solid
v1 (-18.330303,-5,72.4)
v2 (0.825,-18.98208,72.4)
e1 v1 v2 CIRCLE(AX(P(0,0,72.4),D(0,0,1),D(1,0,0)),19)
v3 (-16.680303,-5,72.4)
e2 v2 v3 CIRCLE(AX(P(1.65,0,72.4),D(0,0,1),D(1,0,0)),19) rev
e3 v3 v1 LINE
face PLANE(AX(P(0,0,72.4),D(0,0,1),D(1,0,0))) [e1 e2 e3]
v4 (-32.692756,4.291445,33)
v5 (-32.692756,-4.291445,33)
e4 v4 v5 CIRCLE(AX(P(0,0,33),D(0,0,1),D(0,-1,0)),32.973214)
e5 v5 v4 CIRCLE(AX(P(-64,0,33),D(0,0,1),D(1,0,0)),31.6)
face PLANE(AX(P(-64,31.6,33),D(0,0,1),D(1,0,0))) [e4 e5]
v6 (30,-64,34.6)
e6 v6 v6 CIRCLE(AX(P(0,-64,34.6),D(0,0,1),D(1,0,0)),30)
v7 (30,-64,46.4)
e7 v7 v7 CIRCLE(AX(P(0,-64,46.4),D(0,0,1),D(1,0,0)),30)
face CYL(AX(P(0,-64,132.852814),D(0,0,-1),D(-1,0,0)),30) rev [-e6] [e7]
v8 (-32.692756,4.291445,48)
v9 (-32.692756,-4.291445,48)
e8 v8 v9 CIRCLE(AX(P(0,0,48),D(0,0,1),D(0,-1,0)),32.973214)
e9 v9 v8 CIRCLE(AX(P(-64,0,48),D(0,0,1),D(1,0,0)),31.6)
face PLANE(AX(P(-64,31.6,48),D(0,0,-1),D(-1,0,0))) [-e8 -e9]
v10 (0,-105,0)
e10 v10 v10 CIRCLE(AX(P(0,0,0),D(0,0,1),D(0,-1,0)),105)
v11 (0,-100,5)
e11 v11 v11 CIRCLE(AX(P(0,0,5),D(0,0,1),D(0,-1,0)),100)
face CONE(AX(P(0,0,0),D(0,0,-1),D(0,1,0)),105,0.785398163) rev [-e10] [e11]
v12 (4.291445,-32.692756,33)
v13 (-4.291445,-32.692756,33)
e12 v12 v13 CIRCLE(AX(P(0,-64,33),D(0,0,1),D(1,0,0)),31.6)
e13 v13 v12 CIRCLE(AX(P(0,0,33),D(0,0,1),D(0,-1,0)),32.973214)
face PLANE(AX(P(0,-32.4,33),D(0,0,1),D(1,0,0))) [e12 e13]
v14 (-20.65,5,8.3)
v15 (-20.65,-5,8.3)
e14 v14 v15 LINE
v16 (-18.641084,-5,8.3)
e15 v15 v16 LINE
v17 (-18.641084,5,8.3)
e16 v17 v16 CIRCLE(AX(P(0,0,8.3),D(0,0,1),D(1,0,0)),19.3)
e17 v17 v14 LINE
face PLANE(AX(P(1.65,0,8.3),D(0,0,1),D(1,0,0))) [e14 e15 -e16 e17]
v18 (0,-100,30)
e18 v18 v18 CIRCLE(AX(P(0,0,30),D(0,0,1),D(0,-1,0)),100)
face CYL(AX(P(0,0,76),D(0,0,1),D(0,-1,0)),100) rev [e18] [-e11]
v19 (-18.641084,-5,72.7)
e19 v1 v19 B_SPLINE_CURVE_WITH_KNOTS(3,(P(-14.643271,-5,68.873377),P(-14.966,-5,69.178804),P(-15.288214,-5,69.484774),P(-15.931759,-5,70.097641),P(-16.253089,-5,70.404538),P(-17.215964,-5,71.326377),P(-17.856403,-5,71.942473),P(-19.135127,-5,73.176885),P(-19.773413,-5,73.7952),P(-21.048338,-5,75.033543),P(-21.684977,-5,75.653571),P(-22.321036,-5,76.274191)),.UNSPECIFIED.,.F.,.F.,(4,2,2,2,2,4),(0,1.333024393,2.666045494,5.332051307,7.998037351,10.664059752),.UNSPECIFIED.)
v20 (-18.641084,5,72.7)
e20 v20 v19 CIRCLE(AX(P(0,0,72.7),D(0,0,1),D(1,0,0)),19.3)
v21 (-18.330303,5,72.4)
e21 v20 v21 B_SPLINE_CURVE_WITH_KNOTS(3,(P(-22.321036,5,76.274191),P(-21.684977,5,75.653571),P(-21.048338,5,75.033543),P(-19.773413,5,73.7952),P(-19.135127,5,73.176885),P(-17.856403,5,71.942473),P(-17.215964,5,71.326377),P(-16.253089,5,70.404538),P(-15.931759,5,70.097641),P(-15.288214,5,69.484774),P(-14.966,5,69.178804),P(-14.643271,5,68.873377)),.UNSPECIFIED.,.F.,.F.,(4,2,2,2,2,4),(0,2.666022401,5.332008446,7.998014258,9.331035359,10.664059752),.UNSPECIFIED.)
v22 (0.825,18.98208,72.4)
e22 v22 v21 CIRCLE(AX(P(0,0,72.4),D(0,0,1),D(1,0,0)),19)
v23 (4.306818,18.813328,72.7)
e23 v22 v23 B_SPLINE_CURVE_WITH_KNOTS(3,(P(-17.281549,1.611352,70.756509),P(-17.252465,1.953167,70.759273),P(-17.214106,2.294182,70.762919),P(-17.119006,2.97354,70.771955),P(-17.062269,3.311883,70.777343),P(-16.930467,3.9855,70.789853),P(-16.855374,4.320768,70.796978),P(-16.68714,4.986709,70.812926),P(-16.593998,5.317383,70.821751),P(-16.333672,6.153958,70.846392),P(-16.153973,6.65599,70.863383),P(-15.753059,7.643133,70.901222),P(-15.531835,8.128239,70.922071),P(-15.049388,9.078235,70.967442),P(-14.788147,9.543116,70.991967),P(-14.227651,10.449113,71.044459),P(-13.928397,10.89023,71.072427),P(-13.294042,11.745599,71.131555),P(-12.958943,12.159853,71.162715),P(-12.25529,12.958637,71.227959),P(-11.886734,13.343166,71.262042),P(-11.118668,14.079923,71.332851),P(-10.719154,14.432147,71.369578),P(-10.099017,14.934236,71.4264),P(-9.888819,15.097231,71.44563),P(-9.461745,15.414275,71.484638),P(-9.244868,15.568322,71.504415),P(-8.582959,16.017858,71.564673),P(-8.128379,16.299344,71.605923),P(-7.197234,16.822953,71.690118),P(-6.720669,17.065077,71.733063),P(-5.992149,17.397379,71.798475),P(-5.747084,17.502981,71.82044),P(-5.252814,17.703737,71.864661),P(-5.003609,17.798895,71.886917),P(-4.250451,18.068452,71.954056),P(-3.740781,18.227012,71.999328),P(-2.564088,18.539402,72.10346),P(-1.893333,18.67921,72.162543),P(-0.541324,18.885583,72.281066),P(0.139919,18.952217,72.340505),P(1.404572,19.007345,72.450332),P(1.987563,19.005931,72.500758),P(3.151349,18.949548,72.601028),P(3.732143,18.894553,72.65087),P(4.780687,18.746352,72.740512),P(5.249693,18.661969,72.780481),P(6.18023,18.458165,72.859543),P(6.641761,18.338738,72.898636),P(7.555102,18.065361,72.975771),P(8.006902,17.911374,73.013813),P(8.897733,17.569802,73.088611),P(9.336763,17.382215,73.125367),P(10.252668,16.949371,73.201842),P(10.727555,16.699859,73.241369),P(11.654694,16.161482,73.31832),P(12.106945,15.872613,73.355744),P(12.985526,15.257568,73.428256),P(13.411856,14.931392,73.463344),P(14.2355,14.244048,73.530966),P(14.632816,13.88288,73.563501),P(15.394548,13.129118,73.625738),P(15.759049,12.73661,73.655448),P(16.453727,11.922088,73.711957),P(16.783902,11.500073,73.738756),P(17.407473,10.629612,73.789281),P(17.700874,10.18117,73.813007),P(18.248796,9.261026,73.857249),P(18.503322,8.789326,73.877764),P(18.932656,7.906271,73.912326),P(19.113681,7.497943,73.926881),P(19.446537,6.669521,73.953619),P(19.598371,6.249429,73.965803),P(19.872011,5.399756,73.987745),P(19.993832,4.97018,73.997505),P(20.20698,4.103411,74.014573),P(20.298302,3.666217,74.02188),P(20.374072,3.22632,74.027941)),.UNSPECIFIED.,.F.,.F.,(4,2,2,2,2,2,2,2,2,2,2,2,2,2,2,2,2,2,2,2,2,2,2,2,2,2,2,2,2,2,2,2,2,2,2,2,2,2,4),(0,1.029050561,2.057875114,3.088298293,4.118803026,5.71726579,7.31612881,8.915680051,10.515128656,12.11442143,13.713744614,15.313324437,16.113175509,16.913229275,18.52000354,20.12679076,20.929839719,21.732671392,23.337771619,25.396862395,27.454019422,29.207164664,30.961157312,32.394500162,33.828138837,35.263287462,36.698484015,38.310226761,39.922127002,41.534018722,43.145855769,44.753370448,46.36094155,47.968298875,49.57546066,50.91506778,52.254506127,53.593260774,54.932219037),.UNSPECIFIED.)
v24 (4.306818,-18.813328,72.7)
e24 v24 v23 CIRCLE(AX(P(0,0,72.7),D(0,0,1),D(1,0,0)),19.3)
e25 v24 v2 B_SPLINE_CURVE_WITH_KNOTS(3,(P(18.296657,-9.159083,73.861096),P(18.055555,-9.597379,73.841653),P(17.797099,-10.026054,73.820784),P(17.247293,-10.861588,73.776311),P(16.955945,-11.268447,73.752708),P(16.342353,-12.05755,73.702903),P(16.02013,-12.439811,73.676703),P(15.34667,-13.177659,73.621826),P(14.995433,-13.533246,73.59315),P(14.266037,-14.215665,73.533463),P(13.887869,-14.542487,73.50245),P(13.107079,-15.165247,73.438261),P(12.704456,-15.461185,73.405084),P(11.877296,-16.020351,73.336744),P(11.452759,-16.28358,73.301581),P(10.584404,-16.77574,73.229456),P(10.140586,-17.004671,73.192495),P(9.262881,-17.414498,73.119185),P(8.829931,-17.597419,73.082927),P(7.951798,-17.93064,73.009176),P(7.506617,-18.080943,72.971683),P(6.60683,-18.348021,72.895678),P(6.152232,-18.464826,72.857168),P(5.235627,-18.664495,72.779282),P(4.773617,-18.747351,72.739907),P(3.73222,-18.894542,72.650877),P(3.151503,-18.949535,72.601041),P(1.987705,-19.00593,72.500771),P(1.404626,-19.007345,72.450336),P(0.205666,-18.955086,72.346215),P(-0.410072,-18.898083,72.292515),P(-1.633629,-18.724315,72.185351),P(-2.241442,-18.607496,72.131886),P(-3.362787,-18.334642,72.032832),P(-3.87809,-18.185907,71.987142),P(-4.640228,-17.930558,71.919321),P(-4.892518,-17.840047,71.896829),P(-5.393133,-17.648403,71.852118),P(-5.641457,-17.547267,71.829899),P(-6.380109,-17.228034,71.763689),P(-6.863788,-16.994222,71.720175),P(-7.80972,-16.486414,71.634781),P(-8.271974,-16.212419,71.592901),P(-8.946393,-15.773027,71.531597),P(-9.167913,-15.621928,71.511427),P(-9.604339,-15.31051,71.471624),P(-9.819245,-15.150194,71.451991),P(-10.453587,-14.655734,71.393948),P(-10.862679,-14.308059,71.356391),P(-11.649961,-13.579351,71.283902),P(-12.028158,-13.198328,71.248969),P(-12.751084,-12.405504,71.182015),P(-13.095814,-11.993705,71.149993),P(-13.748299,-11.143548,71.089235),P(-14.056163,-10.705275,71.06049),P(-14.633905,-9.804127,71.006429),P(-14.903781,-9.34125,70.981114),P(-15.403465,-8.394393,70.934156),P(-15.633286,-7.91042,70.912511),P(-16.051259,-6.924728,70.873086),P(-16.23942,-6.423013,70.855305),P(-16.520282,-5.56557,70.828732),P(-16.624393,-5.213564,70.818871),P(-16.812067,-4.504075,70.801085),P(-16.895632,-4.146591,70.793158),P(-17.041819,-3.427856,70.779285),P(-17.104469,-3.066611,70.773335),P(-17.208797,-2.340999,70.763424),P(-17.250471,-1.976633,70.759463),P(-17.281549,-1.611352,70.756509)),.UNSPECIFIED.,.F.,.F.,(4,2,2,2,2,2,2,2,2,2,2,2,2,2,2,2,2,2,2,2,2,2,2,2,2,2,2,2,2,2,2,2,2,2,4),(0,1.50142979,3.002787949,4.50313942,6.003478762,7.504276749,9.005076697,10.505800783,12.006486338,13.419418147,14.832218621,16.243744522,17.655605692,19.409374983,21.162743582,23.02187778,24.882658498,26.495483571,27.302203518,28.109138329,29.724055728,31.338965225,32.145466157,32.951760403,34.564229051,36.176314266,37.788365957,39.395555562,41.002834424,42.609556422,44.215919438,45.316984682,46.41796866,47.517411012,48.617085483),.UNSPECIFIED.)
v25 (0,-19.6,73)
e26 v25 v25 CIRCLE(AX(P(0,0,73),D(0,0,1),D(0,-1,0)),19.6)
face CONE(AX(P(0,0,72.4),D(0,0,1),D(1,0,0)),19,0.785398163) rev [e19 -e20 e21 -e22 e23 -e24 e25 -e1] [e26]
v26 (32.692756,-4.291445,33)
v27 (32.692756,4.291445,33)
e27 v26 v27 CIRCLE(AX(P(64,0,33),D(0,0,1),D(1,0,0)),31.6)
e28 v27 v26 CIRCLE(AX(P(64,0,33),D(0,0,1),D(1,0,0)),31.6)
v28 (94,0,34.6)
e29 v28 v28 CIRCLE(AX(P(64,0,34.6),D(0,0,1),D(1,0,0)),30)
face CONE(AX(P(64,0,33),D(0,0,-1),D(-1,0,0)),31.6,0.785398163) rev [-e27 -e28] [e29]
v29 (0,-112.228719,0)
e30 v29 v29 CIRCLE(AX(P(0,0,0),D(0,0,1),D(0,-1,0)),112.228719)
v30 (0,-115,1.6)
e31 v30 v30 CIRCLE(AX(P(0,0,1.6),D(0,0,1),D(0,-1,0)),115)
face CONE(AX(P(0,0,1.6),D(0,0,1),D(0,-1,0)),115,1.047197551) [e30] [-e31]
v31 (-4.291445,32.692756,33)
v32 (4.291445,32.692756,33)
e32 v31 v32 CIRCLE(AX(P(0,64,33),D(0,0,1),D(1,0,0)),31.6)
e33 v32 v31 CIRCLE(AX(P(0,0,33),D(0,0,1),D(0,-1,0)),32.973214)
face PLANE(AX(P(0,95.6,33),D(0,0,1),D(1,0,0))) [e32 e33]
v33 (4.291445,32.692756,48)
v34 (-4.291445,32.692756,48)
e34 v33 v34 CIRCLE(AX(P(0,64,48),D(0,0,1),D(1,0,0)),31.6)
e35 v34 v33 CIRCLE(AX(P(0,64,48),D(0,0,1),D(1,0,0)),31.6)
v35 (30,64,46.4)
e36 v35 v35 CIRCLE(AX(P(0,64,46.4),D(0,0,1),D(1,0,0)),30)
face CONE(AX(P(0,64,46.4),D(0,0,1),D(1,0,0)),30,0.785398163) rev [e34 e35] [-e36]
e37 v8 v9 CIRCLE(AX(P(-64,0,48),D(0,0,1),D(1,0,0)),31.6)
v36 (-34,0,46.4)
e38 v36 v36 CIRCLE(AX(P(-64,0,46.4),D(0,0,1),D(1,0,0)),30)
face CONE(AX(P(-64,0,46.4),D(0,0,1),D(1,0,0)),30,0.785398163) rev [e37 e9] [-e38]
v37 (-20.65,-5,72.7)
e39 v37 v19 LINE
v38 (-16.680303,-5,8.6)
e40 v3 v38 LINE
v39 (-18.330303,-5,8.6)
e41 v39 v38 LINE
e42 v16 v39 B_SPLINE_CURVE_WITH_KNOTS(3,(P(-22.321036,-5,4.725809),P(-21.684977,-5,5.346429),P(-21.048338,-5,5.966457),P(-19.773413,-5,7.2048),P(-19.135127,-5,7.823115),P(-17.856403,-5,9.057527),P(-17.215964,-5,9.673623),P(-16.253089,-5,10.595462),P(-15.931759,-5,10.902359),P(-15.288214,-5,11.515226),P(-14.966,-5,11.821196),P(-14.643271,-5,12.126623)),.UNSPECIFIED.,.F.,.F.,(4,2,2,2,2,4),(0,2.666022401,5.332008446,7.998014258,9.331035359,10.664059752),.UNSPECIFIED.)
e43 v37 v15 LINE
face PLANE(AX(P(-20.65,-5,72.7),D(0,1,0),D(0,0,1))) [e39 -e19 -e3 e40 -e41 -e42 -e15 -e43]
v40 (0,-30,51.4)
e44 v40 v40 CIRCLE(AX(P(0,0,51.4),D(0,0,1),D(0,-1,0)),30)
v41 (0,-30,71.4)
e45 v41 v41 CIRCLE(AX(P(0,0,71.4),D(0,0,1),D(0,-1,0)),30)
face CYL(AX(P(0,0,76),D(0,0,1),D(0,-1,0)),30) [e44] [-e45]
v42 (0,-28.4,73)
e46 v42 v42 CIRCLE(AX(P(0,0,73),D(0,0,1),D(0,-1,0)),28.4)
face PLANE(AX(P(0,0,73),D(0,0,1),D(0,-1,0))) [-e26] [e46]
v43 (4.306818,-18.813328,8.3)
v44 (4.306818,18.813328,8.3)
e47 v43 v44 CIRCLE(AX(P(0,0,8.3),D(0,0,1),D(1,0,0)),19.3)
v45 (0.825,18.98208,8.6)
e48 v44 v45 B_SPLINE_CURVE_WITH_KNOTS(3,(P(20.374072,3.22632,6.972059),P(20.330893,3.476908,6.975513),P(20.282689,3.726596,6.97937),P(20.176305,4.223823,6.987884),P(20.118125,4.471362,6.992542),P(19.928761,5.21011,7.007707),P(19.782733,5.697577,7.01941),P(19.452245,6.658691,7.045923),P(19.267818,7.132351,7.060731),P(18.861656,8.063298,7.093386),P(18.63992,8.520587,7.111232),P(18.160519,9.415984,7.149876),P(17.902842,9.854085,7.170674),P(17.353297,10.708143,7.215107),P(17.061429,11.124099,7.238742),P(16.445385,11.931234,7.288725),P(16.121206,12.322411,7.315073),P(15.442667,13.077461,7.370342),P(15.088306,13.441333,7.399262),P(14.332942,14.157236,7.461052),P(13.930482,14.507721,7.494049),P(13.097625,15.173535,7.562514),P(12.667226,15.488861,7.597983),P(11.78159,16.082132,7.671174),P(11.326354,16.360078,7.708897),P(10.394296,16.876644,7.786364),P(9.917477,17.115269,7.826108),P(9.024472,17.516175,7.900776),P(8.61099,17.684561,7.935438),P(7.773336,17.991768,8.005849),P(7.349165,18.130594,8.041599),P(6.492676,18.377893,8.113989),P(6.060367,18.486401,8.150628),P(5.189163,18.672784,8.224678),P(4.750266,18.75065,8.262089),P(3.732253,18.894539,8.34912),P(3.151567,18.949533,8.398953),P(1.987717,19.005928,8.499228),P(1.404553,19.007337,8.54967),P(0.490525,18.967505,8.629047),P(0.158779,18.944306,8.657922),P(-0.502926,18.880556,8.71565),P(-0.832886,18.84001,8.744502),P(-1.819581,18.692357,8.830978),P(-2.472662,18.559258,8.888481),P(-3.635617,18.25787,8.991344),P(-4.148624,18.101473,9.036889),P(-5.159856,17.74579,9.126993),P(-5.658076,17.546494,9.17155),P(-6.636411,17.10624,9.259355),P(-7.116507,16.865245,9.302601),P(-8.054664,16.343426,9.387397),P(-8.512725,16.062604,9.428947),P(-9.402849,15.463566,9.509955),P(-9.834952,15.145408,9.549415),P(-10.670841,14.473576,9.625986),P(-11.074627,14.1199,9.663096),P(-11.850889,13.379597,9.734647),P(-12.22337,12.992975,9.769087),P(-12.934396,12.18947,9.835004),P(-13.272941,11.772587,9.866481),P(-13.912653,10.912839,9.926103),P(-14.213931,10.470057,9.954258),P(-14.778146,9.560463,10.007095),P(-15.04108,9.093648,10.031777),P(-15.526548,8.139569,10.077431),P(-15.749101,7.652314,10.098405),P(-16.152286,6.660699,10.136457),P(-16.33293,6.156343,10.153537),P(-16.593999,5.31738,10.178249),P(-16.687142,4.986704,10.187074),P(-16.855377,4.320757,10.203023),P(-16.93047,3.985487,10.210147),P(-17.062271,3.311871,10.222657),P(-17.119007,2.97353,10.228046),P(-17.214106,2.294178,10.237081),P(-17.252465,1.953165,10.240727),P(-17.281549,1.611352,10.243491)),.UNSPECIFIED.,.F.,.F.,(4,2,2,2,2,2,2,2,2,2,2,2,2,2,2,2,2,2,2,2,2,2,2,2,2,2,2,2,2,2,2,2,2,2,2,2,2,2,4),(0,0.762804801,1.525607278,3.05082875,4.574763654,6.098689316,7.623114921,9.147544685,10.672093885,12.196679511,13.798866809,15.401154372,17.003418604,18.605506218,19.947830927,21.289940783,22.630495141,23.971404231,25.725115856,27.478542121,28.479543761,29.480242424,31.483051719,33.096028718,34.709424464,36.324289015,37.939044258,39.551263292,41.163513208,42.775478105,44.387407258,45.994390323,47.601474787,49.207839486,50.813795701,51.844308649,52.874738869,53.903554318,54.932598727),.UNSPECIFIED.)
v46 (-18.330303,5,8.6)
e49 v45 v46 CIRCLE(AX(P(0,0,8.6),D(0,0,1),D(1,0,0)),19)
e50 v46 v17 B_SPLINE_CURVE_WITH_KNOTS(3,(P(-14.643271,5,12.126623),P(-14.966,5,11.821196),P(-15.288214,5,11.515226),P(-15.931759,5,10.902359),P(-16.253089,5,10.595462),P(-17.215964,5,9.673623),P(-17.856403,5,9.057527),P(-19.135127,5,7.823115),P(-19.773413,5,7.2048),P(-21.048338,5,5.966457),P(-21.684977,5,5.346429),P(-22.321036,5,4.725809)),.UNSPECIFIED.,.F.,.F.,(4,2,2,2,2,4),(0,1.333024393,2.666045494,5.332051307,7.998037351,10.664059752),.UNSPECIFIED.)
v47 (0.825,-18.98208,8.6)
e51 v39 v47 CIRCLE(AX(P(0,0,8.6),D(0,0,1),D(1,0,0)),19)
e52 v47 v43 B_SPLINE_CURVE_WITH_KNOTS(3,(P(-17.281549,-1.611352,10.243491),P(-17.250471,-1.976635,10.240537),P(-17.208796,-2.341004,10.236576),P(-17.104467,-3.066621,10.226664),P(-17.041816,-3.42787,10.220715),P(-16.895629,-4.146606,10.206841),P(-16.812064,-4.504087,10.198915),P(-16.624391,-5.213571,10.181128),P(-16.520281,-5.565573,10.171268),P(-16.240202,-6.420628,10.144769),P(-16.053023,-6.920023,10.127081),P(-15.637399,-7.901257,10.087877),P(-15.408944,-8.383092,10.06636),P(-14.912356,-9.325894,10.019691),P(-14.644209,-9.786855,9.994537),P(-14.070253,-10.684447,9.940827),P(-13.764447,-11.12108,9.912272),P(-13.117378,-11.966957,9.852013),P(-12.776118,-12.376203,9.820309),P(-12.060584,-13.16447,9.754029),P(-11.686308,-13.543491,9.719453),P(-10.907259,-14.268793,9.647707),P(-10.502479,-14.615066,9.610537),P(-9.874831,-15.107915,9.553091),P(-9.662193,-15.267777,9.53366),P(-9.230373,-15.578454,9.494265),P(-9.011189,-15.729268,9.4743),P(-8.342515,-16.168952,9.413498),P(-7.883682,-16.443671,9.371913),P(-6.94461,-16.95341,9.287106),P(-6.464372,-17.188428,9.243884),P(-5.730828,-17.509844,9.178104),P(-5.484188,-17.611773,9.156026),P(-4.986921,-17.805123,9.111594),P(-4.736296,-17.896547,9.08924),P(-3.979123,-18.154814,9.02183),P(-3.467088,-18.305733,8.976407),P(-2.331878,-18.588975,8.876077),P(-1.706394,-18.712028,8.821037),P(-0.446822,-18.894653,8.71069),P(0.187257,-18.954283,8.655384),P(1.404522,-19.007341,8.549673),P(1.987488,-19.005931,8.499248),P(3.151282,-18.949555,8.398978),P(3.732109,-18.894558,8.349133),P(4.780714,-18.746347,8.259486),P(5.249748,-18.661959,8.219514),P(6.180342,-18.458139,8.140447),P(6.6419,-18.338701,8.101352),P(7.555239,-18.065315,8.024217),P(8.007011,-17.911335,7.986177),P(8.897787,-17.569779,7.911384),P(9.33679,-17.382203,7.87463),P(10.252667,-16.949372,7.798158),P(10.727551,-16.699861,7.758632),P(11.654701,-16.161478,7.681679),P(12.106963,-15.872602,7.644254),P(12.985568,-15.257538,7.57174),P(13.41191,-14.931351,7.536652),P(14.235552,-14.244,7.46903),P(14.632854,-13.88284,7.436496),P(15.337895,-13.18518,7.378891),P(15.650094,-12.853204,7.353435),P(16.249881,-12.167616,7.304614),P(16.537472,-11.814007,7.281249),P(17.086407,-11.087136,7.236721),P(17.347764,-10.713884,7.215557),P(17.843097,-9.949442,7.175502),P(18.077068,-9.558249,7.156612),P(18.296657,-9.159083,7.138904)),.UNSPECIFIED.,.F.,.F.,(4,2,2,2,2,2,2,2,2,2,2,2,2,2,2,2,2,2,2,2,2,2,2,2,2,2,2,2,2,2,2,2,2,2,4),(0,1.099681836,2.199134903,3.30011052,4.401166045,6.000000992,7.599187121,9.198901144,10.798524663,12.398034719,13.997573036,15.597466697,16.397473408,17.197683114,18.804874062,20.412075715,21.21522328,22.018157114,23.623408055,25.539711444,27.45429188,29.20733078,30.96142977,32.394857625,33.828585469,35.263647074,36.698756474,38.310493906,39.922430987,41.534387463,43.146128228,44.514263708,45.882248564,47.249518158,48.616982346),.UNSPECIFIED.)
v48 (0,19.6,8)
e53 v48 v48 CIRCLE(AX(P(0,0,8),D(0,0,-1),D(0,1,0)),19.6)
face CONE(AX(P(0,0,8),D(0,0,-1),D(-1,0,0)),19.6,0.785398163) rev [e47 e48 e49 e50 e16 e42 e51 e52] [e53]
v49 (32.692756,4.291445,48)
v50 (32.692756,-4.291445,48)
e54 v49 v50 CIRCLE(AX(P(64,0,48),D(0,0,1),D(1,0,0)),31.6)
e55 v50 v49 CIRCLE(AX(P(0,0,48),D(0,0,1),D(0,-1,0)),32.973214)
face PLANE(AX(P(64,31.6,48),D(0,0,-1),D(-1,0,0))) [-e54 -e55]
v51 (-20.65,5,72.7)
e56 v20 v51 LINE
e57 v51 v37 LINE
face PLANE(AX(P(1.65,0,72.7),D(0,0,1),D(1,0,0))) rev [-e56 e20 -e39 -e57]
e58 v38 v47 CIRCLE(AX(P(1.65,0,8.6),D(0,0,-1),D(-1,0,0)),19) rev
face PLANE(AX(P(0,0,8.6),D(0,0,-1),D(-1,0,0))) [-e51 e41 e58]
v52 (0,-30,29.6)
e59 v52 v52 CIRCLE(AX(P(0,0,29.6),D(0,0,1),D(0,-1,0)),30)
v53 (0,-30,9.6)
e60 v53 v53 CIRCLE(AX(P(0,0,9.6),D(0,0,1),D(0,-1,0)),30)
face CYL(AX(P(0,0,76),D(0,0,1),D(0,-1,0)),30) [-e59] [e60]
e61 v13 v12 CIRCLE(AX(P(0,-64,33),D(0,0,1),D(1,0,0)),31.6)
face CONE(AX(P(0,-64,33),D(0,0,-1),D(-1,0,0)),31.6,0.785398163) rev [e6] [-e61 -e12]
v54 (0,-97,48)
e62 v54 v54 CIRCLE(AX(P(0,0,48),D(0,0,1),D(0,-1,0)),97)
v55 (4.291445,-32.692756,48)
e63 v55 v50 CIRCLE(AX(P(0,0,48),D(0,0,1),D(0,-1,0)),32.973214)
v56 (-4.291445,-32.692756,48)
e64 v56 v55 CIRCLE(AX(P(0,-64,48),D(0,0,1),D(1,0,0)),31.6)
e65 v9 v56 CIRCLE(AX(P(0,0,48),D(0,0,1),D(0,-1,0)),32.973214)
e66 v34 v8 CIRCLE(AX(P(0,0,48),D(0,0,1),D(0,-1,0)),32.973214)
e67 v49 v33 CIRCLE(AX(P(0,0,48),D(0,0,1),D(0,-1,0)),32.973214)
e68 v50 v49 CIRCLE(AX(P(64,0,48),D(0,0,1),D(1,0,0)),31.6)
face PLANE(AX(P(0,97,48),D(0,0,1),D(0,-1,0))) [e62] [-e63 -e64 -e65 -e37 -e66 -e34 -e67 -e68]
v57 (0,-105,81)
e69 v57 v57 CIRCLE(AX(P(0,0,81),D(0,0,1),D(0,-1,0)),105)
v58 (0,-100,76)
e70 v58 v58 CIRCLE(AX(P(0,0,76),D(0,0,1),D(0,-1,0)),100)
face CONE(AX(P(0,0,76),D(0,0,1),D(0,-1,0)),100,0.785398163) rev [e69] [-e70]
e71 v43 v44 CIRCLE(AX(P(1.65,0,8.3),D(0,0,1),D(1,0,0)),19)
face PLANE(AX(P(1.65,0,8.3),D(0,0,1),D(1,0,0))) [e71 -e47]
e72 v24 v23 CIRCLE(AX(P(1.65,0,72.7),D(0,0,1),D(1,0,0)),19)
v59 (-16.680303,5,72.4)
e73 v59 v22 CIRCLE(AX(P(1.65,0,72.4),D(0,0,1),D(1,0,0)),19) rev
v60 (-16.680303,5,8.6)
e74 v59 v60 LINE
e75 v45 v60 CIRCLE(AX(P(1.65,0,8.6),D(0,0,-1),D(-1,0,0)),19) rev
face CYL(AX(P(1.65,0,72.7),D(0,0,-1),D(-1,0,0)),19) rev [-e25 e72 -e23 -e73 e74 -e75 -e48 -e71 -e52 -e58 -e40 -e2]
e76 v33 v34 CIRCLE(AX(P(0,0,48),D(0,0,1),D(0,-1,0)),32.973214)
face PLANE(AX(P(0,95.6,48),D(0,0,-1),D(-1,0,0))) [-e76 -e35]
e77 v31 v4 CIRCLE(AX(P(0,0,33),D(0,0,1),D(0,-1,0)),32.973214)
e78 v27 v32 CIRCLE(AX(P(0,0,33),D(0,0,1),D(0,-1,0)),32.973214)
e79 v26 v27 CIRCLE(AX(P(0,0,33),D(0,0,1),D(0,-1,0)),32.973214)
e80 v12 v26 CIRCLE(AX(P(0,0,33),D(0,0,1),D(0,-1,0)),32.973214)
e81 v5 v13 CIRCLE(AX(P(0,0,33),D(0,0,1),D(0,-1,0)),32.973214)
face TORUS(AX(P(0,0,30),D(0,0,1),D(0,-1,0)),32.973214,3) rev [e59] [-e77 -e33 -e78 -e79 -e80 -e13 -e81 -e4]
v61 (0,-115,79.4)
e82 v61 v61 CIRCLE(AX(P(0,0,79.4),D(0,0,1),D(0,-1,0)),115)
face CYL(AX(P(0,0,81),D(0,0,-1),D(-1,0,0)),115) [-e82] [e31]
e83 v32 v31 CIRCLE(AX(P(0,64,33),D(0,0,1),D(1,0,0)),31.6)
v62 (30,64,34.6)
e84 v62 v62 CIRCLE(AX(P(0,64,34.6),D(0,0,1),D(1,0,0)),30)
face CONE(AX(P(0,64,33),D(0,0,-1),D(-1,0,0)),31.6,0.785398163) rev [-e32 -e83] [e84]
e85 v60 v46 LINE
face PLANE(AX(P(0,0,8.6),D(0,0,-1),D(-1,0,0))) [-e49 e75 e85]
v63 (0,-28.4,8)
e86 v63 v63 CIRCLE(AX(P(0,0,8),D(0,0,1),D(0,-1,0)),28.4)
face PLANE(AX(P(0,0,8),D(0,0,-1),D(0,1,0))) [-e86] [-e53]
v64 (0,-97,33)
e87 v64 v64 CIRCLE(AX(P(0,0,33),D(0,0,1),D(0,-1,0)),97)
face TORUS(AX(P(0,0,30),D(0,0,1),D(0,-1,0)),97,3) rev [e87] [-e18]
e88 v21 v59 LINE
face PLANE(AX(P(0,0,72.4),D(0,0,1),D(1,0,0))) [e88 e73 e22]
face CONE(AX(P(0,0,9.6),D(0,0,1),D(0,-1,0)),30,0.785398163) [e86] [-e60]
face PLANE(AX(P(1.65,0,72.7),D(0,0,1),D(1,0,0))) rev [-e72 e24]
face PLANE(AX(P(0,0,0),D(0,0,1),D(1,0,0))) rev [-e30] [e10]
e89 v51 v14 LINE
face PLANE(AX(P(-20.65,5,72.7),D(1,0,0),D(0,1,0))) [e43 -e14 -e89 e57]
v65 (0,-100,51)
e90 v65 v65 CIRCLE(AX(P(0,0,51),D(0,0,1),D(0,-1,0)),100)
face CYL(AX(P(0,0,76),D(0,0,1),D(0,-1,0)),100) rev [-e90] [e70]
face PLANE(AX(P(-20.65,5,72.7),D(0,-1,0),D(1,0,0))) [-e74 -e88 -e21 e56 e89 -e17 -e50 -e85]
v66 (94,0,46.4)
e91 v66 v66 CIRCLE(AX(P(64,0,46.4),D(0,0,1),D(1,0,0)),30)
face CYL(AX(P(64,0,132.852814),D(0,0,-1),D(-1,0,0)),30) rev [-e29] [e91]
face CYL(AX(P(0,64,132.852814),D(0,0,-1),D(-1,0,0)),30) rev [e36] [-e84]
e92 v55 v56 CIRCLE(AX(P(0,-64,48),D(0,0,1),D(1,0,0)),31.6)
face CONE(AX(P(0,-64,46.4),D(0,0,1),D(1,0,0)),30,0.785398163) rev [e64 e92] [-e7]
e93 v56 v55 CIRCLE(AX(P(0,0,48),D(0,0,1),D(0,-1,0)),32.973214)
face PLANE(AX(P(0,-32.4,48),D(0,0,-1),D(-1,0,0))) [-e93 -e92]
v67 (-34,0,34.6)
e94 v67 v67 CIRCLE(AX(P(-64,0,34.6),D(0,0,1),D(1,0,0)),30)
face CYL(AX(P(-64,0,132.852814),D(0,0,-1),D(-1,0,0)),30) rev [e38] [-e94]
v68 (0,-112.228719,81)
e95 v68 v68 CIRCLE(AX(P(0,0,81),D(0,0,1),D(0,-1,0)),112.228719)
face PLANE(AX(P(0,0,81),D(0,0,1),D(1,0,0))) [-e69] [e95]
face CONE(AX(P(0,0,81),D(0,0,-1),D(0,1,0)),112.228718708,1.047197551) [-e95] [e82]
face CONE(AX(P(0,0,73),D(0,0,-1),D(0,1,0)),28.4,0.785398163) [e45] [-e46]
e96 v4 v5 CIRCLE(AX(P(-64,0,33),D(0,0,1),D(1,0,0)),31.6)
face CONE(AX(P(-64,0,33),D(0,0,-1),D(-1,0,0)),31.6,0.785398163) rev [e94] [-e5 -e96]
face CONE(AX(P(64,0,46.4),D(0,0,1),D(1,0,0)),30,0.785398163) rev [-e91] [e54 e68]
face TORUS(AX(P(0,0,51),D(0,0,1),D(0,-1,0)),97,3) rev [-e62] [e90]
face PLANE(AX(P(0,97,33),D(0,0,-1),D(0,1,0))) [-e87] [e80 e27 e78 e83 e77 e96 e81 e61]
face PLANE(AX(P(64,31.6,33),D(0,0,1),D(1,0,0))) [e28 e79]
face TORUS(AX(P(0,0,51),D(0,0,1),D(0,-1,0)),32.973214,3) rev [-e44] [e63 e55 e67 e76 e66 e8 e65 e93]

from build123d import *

# Parameters (mm, degrees)
SKETCH3_R                      = 115
BOSS_EXTRUDE1_DEPTH            = 81
CUT_EXTRUDE1_REACH             = 169.601
SKETCH9_R                      = 30
CUT_EXTRUDE1_DIRECTION_2_REACH = 169.601
CUT_EXTRUDE2_DEPTH             = 32.2


# Read off the part's stored shape, not the designer's step: Cut-Revolve11
with BuildPart() as part:
    # Sketch3 → Boss-Extrude1 (new body)
    with BuildSketch(Plane.XY):
        Circle(SKETCH3_R)
    extrude(amount=BOSS_EXTRUDE1_DEPTH)

    # Sketch5 → Cut-Revolve3 (revolve, cut)
    with BuildSketch(Plane(origin=(0, 0, 0), x_dir=(0, 0, -1), z_dir=(1, 0, 0)), mode=Mode.PRIVATE) as cut_revolve3_sk:
        Polygon((-81, 105), (-76, 100), (-76, 0), (-81, 0), align=None)
        Polygon((-5, 0), (0, 0), (0, 105), (-5, 100), align=None)
        Polygon((0, 112.228718708), (-1.6, 115), (-79.4, 115), (-81, 112.228718708), (-81, 120.654607227), (0, 120.654607227), align=None)
    revolve(cut_revolve3_sk.sketch.rotate(Axis((0, 0, 76), (0, 0, -1)), 180), axis=Axis((0, 0, 76), (0, 0, -1)), mode=Mode.SUBTRACT)

    # Cut-Revolve11 outline → Cut-Revolve11 (revolve, cut)
    with BuildSketch(Plane.XZ):
        Polygon((0, 72.4), (19, 72.4), (19.6, 73), (0, 73), align=None)
        Polygon((19, 8.6), (0, 8.6), (0, 8), (19.6, 8), align=None)
    revolve(axis=Axis((0, 0, 0), (0, 0, 1)), mode=Mode.SUBTRACT)

    # Sketch6 → Cut-Revolve4 (revolve, cut)
    with BuildSketch(Plane(origin=(0, 0, 0), x_dir=(0, 0, -1), z_dir=(1, 0, 0)), mode=Mode.PRIVATE) as cut_revolve4_sk:
        with BuildLine():
            Line((-76, 100), (-51, 100))
            ThreePointArc((-51, 100), (-48.878679656, 99.121320344), (-48, 97))
            Line((-48, 97), (-48, 32.973213749))
            ThreePointArc((-48, 32.973213749), (-49.025158234, 30.714895791), (-51.4, 30))
            Line((-51.4, 30), (-71.4, 30))
            Line((-71.4, 30), (-73, 28.4))
            Line((-73, 28.4), (-73, 0))
            Line((-73, 0), (-76, 0))
            Line((-76, 0), (-76, 100))
        make_face()
        with BuildLine():
            Line((-8, 0), (-5, 0))
            Line((-5, 0), (-5, 100))
            Line((-5, 100), (-30, 100))
            ThreePointArc((-30, 100), (-32.121320344, 99.121320344), (-33, 97))
            Line((-33, 97), (-33, 32.973213749))
            ThreePointArc((-33, 32.973213749), (-31.974841766, 30.714895791), (-29.6, 30))
            Line((-29.6, 30), (-9.6, 30))
            Line((-9.6, 30), (-8, 28.4))
            Line((-8, 28.4), (-8, 0))
        make_face()
    revolve(cut_revolve4_sk.sketch.rotate(Axis((0, 0, 76), (0, 0, -1)), 180), axis=Axis((0, 0, 76), (0, 0, -1)), mode=Mode.SUBTRACT)

    # Cut-Extrude1: up to this face of the body (flat: up to its plane)
    cut_extrude1_end = Plane(part.part.faces().sort_by_distance((0, 94.256425689, 48))[0])
    # Sketch9 → Cut-Extrude1 (cut, up to the picked face)
    with BuildSketch(Plane.XY.offset(40.5), mode=Mode.PRIVATE) as cut_extrude1_sk1:
        with Locations(Location((0, 64, 0), (0, 0, 90))):
            Circle(SKETCH9_R)
    cut_extrude1_tool1 = split(extrude(cut_extrude1_sk1.sketch, amount=CUT_EXTRUDE1_REACH, mode=Mode.PRIVATE), bisect_by=cut_extrude1_end, keep=Keep.BOTH, mode=Mode.PRIVATE)
    # Sketch9 → Cut-Extrude1 (cut, up to the picked face)
    with BuildSketch(Plane.XY.offset(40.5), mode=Mode.PRIVATE) as cut_extrude1_sk2:
        with Locations(Location((-64, 0, 0), (0, 0, 90))):
            Circle(SKETCH9_R)
    cut_extrude1_tool2 = split(extrude(cut_extrude1_sk2.sketch, amount=CUT_EXTRUDE1_REACH, mode=Mode.PRIVATE), bisect_by=cut_extrude1_end, keep=Keep.BOTH, mode=Mode.PRIVATE)
    # Sketch9 → Cut-Extrude1 (cut, up to the picked face)
    with BuildSketch(Plane.XY.offset(40.5), mode=Mode.PRIVATE) as cut_extrude1_sk3:
        with Locations(Location((0, -64, 0), (0, 0, 90))):
            Circle(SKETCH9_R)
    cut_extrude1_tool3 = split(extrude(cut_extrude1_sk3.sketch, amount=CUT_EXTRUDE1_REACH, mode=Mode.PRIVATE), bisect_by=cut_extrude1_end, keep=Keep.BOTH, mode=Mode.PRIVATE)
    # Sketch9 → Cut-Extrude1 (cut, up to the picked face)
    with BuildSketch(Plane.XY.offset(40.5), mode=Mode.PRIVATE) as cut_extrude1_sk4:
        with Locations(Location((64, 0, 0), (0, 0, 90))):
            Circle(SKETCH9_R)
    cut_extrude1_tool4 = split(extrude(cut_extrude1_sk4.sketch, amount=CUT_EXTRUDE1_REACH, mode=Mode.PRIVATE), bisect_by=cut_extrude1_end, keep=Keep.BOTH, mode=Mode.PRIVATE)
    add(cut_extrude1_tool1.solids().sort_by(Axis((0, 64, 40.5), (0, 0, 1)))[0], mode=Mode.SUBTRACT)
    add(cut_extrude1_tool2.solids().sort_by(Axis((-64, 0, 40.5), (0, 0, 1)))[0], mode=Mode.SUBTRACT)
    add(cut_extrude1_tool3.solids().sort_by(Axis((0, -64, 40.5), (0, 0, 1)))[0], mode=Mode.SUBTRACT)
    add(cut_extrude1_tool4.solids().sort_by(Axis((64, 0, 40.5), (0, 0, 1)))[0], mode=Mode.SUBTRACT)

    # Cut-Extrude1 direction 2: up to this face of the body (flat: up to its plane)
    cut_extrude1_direction_2_end = Plane(part.part.faces().sort_by_distance((0, 94.256425689, 33))[0])
    # Sketch9 → Cut-Extrude1 direction 2 (cut, up to the picked face)
    with BuildSketch(Plane.XY.offset(40.5), mode=Mode.PRIVATE) as cut_extrude1_direction_2_sk1:
        with Locations(Location((0, 64, 0), (0, 0, 90))):
            Circle(SKETCH9_R)
    cut_extrude1_direction_2_tool1 = split(extrude(cut_extrude1_direction_2_sk1.sketch, amount=-CUT_EXTRUDE1_DIRECTION_2_REACH, mode=Mode.PRIVATE), bisect_by=cut_extrude1_direction_2_end, keep=Keep.BOTH, mode=Mode.PRIVATE)
    # Sketch9 → Cut-Extrude1 direction 2 (cut, up to the picked face)
    with BuildSketch(Plane.XY.offset(40.5), mode=Mode.PRIVATE) as cut_extrude1_direction_2_sk2:
        with Locations(Location((-64, 0, 0), (0, 0, 90))):
            Circle(SKETCH9_R)
    cut_extrude1_direction_2_tool2 = split(extrude(cut_extrude1_direction_2_sk2.sketch, amount=-CUT_EXTRUDE1_DIRECTION_2_REACH, mode=Mode.PRIVATE), bisect_by=cut_extrude1_direction_2_end, keep=Keep.BOTH, mode=Mode.PRIVATE)
    # Sketch9 → Cut-Extrude1 direction 2 (cut, up to the picked face)
    with BuildSketch(Plane.XY.offset(40.5), mode=Mode.PRIVATE) as cut_extrude1_direction_2_sk3:
        with Locations(Location((0, -64, 0), (0, 0, 90))):
            Circle(SKETCH9_R)
    cut_extrude1_direction_2_tool3 = split(extrude(cut_extrude1_direction_2_sk3.sketch, amount=-CUT_EXTRUDE1_DIRECTION_2_REACH, mode=Mode.PRIVATE), bisect_by=cut_extrude1_direction_2_end, keep=Keep.BOTH, mode=Mode.PRIVATE)
    # Sketch9 → Cut-Extrude1 direction 2 (cut, up to the picked face)
    with BuildSketch(Plane.XY.offset(40.5), mode=Mode.PRIVATE) as cut_extrude1_direction_2_sk4:
        with Locations(Location((64, 0, 0), (0, 0, 90))):
            Circle(SKETCH9_R)
    cut_extrude1_direction_2_tool4 = split(extrude(cut_extrude1_direction_2_sk4.sketch, amount=-CUT_EXTRUDE1_DIRECTION_2_REACH, mode=Mode.PRIVATE), bisect_by=cut_extrude1_direction_2_end, keep=Keep.BOTH, mode=Mode.PRIVATE)
    add(cut_extrude1_direction_2_tool1.solids().sort_by(Axis((0, 64, 40.5), (0, 0, -1)))[0], mode=Mode.SUBTRACT)
    add(cut_extrude1_direction_2_tool2.solids().sort_by(Axis((-64, 0, 40.5), (0, 0, -1)))[0], mode=Mode.SUBTRACT)
    add(cut_extrude1_direction_2_tool3.solids().sort_by(Axis((0, -64, 40.5), (0, 0, -1)))[0], mode=Mode.SUBTRACT)
    add(cut_extrude1_direction_2_tool4.solids().sort_by(Axis((64, 0, 40.5), (0, 0, -1)))[0], mode=Mode.SUBTRACT)

    # Sketch10 → Cut-Extrude2 (cut, symmetric)
    with BuildSketch(Plane.XY.offset(40.5)):
        with BuildLine():
            Line((-20.65, 5), (-20.65, -5))
            Line((-20.65, -5), (-16.68030278, -5))
            ThreePointArc((-16.68030278, -5), (20.65, 0), (-16.68030278, 5))
            Line((-16.68030278, 5), (-20.65, 5))
        make_face()
    extrude(amount=CUT_EXTRUDE2_DEPTH, both=True, mode=Mode.SUBTRACT)

    # Sketch15 → Cut-Revolve7 (revolve, cut)
    with BuildSketch(Plane(origin=(0, 0, 0), x_dir=(0, 0, -1), z_dir=(1, 0, 0)), mode=Mode.PRIVATE) as cut_revolve7_sk:
        Polygon((-48, 95.6), (-48, 64), (-46.4, 64), (-46.4, 94), align=None)
        Polygon((-33, 64), (-34.6, 64), (-34.6, 94), (-33, 95.6), align=None)
    revolve(cut_revolve7_sk.sketch.rotate(Axis((0, 64, 40.5), (0, 0, -1)), 90), axis=Axis((0, 64, 40.5), (0, 0, -1)), mode=Mode.SUBTRACT)

    # Sketch17 → Cut-Revolve8 (revolve, cut)
    with BuildSketch(Plane(origin=(0, 0, 0), x_dir=(0, 0, -1), z_dir=(1, 0, 0)), mode=Mode.PRIVATE) as cut_revolve8_sk:
        Polygon((-48, -32.4), (-48, -64), (-46.4, -64), (-46.4, -34), align=None)
        Polygon((-33, -64), (-34.6, -64), (-34.6, -34), (-33, -32.4), align=None)
    revolve(cut_revolve8_sk.sketch.rotate(Axis((0, -64, 40.5), (0, 0, -1)), 90), axis=Axis((0, -64, 40.5), (0, 0, -1)), mode=Mode.SUBTRACT)

    # Sketch18 → Cut-Revolve9 (revolve, cut)
    with BuildSketch(Plane(origin=(64, 0, 0), x_dir=(0, 0, -1), z_dir=(1, 0, 0)), mode=Mode.PRIVATE) as cut_revolve9_sk:
        Polygon((-48, 31.6), (-48, 0), (-46.4, 0), (-46.4, 30), align=None)
        Polygon((-33, 0), (-34.6, 0), (-34.6, 30), (-33, 31.6), align=None)
    revolve(cut_revolve9_sk.sketch.rotate(Axis((64, 0, 40.5), (0, 0, -1)), 90), axis=Axis((64, 0, 40.5), (0, 0, -1)), mode=Mode.SUBTRACT)

    # Sketch19 → Cut-Revolve10 (revolve, cut)
    with BuildSketch(Plane(origin=(-64, 0, 0), x_dir=(0, 0, -1), z_dir=(1, 0, 0)), mode=Mode.PRIVATE) as cut_revolve10_sk:
        Polygon((-48, 31.6), (-48, 0), (-46.4, 0), (-46.4, 30), align=None)
        Polygon((-33, 0), (-34.6, 0), (-34.6, 30), (-33, 31.6), align=None)
    revolve(cut_revolve10_sk.sketch.rotate(Axis((-64, 0, 40.5), (0, 0, -1)), 90), axis=Axis((-64, 0, 40.5), (0, 0, -1)), mode=Mode.SUBTRACT)


solid = part.part
